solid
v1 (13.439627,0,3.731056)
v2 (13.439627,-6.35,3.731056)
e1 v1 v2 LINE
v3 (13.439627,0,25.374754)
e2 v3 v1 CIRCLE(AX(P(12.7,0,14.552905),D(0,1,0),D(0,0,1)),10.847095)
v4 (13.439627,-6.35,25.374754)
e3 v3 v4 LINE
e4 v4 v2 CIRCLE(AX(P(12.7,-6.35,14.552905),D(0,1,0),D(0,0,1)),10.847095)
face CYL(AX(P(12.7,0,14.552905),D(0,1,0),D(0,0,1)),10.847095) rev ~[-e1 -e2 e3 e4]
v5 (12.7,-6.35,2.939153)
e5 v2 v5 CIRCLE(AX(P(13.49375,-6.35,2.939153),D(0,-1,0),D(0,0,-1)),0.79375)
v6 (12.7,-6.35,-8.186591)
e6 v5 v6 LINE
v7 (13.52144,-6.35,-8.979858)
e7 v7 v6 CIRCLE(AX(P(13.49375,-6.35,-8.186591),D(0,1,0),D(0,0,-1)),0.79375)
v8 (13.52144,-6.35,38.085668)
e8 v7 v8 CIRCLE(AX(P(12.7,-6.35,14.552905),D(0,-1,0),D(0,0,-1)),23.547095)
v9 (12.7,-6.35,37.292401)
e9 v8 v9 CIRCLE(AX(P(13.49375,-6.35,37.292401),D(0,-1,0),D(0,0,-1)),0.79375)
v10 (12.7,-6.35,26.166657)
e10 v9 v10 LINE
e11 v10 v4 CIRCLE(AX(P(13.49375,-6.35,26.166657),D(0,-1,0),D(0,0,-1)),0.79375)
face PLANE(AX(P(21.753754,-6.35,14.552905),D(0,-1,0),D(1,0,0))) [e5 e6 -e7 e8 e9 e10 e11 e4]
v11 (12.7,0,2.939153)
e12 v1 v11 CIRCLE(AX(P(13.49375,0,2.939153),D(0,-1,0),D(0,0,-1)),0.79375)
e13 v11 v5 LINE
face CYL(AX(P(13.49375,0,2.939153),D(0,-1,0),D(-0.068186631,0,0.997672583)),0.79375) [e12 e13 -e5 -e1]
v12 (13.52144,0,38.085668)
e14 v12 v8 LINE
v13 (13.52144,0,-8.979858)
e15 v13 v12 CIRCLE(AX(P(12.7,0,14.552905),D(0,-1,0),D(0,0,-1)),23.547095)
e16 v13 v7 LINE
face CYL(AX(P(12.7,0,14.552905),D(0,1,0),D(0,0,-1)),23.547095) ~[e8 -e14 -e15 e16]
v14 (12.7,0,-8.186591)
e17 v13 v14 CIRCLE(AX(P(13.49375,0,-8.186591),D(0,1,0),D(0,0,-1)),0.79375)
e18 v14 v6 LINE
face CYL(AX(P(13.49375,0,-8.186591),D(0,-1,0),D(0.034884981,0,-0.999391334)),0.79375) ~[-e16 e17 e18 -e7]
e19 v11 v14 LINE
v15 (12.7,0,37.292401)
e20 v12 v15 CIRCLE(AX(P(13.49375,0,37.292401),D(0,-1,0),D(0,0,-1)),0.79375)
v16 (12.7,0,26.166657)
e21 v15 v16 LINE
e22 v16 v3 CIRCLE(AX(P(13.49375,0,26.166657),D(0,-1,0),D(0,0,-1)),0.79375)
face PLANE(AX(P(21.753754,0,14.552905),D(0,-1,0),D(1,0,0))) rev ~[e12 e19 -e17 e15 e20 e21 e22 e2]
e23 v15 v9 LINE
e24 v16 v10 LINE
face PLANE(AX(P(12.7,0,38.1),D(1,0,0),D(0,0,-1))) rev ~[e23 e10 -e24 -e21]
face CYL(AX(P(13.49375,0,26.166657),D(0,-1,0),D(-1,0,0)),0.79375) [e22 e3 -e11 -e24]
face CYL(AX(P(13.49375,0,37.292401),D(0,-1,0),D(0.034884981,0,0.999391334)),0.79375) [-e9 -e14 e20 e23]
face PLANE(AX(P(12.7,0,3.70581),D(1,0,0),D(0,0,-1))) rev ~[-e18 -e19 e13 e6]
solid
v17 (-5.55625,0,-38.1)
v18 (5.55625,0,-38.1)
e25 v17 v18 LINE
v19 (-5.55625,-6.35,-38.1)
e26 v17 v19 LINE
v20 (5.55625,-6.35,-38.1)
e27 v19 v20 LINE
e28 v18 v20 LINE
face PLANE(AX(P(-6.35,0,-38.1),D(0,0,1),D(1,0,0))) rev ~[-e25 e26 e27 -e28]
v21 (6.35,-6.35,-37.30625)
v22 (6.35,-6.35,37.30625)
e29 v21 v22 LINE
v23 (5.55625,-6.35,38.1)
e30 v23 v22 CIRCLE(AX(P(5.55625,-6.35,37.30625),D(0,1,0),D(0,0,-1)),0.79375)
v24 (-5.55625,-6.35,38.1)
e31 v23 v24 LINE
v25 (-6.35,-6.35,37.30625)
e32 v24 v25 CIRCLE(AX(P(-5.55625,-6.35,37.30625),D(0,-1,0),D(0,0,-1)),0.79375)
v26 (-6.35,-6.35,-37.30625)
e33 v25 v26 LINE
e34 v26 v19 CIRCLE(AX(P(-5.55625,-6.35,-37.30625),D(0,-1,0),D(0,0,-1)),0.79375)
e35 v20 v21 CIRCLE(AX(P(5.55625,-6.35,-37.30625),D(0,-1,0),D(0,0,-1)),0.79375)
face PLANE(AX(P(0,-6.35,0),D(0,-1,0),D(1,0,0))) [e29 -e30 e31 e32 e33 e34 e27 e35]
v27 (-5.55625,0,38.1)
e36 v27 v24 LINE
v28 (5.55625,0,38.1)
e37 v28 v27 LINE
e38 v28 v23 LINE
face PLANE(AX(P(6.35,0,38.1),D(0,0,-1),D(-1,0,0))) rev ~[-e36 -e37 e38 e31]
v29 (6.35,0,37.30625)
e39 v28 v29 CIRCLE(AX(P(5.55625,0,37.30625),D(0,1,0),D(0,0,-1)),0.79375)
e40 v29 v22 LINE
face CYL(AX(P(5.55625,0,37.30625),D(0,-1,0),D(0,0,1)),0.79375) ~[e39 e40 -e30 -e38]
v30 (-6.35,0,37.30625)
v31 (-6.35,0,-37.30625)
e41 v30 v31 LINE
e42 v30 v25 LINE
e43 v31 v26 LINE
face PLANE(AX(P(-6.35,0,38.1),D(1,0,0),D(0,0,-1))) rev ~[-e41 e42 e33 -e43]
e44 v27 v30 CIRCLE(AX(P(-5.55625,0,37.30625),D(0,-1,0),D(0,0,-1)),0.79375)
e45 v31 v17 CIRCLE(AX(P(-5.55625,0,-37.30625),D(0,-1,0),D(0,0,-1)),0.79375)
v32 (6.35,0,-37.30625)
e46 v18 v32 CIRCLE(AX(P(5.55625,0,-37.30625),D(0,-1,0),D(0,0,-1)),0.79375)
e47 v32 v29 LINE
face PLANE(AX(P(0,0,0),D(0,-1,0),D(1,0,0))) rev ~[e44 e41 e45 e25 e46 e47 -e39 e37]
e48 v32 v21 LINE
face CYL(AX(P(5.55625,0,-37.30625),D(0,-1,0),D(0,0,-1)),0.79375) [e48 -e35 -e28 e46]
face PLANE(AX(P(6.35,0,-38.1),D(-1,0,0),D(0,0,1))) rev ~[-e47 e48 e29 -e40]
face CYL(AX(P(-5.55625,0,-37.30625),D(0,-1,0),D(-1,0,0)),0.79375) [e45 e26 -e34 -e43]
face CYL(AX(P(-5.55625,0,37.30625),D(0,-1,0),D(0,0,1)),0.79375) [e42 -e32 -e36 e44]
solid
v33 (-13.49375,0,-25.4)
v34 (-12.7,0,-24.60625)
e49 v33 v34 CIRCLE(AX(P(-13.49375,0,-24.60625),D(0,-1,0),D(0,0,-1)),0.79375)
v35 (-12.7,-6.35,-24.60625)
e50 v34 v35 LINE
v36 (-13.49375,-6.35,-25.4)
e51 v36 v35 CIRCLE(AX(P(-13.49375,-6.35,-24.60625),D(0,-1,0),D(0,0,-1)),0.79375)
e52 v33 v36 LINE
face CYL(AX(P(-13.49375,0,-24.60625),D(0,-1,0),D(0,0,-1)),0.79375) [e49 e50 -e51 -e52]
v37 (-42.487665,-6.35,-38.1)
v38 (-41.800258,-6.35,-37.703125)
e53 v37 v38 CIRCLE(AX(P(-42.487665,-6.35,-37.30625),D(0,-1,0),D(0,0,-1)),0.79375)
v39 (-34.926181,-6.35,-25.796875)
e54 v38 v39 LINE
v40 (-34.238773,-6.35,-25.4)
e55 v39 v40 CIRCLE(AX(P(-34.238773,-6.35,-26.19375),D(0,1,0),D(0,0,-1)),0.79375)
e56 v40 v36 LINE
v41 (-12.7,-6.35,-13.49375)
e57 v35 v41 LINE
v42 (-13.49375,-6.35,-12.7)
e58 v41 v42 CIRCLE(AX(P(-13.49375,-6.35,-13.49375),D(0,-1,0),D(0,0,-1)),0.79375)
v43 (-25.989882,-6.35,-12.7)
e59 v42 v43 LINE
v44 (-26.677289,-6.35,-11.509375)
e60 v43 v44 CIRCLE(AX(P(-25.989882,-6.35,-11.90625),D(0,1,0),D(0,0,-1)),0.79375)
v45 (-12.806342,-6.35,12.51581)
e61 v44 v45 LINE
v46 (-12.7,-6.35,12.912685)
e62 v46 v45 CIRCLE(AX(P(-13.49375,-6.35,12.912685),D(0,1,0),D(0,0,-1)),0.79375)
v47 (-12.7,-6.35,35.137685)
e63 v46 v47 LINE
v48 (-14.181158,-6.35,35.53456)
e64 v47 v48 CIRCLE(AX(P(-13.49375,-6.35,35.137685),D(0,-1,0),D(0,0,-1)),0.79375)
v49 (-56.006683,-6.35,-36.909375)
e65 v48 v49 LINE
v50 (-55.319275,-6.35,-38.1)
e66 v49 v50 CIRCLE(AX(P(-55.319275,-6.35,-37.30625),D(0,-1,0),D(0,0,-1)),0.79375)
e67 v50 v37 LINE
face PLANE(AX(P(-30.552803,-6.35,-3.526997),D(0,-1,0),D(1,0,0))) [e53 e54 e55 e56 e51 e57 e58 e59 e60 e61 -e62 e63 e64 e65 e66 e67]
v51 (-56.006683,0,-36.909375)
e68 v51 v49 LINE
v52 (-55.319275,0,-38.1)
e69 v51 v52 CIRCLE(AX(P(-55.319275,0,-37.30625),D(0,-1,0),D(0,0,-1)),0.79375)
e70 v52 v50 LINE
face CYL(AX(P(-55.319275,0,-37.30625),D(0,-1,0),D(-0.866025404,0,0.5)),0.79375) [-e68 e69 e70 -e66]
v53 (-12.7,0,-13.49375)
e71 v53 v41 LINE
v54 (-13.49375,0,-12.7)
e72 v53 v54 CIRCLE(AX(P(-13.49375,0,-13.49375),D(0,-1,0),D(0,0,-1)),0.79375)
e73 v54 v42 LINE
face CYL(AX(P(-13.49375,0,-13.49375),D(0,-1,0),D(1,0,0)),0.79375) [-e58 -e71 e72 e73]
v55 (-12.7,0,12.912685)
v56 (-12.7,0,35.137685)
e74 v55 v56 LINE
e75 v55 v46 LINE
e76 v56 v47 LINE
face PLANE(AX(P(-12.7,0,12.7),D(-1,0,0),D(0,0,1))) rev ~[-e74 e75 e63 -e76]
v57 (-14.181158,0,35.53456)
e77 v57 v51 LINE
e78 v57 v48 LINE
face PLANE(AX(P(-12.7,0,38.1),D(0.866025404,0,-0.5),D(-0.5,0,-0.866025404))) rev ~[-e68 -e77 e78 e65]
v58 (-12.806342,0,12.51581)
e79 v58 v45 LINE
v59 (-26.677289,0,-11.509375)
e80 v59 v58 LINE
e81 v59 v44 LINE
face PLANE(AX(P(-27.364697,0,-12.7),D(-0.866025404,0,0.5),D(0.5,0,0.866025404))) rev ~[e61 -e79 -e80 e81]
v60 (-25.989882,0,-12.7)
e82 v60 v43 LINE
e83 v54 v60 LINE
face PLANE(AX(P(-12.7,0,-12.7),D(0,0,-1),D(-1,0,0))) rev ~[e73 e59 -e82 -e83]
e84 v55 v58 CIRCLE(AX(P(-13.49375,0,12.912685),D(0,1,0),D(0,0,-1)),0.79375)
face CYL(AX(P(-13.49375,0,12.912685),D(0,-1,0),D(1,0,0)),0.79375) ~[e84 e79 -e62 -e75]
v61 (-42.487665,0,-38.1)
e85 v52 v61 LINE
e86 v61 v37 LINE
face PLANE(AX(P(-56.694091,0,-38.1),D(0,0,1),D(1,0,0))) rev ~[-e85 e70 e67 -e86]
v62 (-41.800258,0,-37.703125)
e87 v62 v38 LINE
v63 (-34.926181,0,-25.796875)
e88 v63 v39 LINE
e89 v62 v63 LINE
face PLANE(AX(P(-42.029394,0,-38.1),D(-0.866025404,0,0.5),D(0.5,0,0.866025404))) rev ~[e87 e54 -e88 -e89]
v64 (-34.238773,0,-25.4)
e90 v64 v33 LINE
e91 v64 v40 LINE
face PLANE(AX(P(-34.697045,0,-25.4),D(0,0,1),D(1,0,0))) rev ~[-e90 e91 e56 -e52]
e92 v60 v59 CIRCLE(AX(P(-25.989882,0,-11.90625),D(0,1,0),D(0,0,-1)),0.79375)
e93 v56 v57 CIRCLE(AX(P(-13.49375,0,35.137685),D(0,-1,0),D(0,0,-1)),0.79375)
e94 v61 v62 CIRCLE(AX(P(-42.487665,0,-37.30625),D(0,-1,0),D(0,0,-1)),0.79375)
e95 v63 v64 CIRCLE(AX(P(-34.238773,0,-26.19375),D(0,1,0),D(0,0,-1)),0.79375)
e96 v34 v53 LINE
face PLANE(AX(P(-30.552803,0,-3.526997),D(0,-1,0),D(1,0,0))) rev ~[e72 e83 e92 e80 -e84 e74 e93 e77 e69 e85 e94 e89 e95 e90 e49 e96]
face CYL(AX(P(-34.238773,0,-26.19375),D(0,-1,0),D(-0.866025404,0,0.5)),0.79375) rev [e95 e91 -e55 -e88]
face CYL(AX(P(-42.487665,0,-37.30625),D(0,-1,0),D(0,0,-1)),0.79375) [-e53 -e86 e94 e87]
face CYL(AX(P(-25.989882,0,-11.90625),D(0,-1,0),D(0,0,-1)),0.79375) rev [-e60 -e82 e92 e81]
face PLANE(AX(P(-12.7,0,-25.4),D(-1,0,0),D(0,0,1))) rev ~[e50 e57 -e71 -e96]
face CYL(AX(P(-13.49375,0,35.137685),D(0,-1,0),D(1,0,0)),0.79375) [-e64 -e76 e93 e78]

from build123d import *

# Parameters (mm, degrees)
F2_DEPTH = 6.35
F3_R     = 0.79375
F3_2_R   = 0.79375
F3_3_R   = 0.79375


# Not quite as in the source:
# - a variable given as a bare number and used for a length is read in inches; the dataset says mm whatever the document's units were


with BuildPart() as f2:
    # F1 (on Front) → F2 (new body)
    with BuildSketch(Plane.XZ):
        Polygon((-12.7, 12.7), (-12.7, 38.1), (-56.6940905122, -38.1), (-42.0293936748, -38.1), (-34.6970452561, -25.4), (-27.3646968374, -12.7), align=None)
        Polygon((-12.7, -25.4), (-12.7, -12.7), (-27.3646968374, -12.7), (-34.6970452561, -25.4), align=None)
    extrude(amount=F2_DEPTH)

    # F3
    f3_edges = [f2.edges().sort_by_distance(p)[0] for p in [
        (-12.7, -3.175, 38.1),
        (-12.7, -3.175, 12.7),
        (-12.7, -3.175, -25.4),
        (-34.697045, -3.175, -25.4),
        (-42.029394, -3.175, -38.1),
        (-56.694091, -3.175, -38.1),
        (-27.364697, -3.175, -12.7),
        (-12.7, -3.175, -12.7),
    ]]
    fillet(f3_edges, radius=F3_R)


with BuildPart() as f2b:
    # F1 (on Front) → F2, piece 2 (new body)
    with BuildSketch(Plane.XZ):
        Polygon((6.35, 38.1), (-6.35, 38.1), (-6.35, 12.7), (-6.35, -12.7), (-6.35, -25.4), (-6.35, -38.1), (6.35, -38.1), (6.35, -8.9941899428), (6.35, 3.7058100572), (6.35, 25.4), align=None)
    extrude(amount=F2_DEPTH)

    # F3#2
    f3_2_edges = [f2b.edges().sort_by_distance(p)[0] for p in [
        (-6.35, -3.175, 38.1),
        (6.35, -3.175, 38.1),
        (-6.35, -3.175, -38.1),
        (6.35, -3.175, -38.1),
    ]]
    fillet(f3_2_edges, radius=F3_2_R)


with BuildPart() as f2c:
    # F1 (on Front) → F2, piece 3 (new body)
    with BuildSketch(Plane.XZ):
        with BuildLine():
            ThreePointArc((12.7, -8.9941899428), (36.2470949714, 14.5529050286), (12.7, 38.1))
            Line((12.7, 38.1), (12.7, 25.4))
            ThreePointArc((12.7, 25.4), (23.5470949714, 14.5529050286), (12.7, 3.7058100572))
            Line((12.7, 3.7058100573), (12.7, -8.9941899428))
        make_face()
    extrude(amount=F2_DEPTH)

    # F3#3
    f3_3_edges = [f2c.edges().sort_by_distance(p)[0] for p in [
        (12.7, -3.175, -8.99419),
        (12.7, -3.175, 3.70581),
        (12.7, -3.175, 25.4),
        (12.7, -3.175, 38.1),
    ]]
    fillet(f3_3_edges, radius=F3_3_R)


solid = Compound([f2.part, f2b.part, f2c.part])
